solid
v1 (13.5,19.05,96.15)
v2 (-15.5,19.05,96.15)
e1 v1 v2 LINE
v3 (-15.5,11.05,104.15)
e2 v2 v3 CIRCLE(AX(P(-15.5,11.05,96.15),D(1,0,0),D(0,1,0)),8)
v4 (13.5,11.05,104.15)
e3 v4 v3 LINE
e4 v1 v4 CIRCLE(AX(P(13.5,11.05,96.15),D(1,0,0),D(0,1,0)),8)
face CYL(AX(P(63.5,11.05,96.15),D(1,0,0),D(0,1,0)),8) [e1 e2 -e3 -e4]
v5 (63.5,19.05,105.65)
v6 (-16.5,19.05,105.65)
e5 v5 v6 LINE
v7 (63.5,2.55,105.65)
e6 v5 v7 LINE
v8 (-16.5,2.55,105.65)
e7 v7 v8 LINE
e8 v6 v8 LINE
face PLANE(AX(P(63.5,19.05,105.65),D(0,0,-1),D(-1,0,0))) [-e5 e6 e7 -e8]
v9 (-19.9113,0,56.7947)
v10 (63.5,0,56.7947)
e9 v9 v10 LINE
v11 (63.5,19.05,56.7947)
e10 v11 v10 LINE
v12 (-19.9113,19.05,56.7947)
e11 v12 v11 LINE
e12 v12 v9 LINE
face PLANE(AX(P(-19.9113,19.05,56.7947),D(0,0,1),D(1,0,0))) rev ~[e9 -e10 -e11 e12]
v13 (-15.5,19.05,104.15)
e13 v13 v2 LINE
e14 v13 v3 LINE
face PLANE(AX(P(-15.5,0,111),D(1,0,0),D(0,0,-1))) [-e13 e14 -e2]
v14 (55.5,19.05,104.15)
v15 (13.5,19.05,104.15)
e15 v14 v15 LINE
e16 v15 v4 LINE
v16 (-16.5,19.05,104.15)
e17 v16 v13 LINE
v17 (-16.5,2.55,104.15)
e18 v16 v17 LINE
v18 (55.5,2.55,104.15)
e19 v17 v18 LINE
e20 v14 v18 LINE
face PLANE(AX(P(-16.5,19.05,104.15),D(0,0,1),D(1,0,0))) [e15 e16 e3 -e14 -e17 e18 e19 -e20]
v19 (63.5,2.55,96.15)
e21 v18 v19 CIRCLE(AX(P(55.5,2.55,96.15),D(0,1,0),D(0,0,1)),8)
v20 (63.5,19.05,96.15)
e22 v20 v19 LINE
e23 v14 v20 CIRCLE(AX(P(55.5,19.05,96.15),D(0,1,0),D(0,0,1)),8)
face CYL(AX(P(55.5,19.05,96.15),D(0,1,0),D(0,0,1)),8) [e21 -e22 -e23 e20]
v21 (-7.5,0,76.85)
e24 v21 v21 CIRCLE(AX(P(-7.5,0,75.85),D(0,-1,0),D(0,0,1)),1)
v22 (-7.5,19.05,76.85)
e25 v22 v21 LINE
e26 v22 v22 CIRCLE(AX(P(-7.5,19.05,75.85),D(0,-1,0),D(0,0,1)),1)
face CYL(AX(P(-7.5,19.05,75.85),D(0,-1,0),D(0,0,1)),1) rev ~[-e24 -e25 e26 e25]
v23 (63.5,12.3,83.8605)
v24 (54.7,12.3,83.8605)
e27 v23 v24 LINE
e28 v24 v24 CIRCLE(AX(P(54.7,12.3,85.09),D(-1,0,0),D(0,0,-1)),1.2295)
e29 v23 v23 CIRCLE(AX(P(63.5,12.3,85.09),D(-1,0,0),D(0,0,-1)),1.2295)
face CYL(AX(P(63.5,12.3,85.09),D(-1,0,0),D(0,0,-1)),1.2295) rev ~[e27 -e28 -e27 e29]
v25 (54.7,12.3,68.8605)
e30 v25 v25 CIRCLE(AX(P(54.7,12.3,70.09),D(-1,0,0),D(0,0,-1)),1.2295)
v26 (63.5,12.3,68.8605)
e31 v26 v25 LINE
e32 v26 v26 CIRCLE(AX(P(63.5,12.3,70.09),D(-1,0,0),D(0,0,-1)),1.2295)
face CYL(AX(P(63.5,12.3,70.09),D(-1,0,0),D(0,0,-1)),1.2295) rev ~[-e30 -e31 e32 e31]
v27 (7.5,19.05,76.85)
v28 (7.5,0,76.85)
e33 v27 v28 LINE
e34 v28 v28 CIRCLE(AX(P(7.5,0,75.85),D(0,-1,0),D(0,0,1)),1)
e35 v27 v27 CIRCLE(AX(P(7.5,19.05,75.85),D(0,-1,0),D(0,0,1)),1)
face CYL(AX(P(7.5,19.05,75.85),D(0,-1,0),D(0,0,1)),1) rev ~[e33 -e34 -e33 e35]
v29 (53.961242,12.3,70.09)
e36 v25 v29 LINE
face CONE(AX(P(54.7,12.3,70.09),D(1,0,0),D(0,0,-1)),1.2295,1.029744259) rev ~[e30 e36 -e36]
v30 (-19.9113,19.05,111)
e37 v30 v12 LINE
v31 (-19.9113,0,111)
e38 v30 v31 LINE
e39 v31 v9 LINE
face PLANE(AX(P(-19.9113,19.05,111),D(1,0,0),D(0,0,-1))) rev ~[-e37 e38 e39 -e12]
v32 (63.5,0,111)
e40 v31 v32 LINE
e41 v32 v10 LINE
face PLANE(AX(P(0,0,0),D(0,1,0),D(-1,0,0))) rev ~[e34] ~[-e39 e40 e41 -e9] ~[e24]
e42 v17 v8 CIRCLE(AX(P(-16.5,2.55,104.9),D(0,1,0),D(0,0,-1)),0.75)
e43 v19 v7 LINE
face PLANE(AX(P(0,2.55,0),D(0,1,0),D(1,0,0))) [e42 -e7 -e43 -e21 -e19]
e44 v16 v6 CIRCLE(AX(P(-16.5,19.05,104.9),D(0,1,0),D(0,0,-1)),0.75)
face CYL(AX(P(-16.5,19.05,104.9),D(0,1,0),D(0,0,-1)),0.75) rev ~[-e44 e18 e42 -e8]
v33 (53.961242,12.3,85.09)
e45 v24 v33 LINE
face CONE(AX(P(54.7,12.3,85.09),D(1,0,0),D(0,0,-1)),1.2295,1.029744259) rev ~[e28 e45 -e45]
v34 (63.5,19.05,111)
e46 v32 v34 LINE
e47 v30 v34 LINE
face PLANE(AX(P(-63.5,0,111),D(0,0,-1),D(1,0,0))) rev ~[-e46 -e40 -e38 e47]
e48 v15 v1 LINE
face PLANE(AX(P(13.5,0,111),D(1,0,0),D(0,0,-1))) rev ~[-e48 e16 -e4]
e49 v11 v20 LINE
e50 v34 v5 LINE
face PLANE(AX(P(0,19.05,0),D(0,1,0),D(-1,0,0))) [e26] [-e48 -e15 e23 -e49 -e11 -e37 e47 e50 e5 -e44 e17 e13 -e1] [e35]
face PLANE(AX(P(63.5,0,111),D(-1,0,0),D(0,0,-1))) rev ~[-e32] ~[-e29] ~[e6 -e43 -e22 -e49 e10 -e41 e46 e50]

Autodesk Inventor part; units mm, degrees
ref_plane "YZ Plane" through (0, 0, 0) normal (1, 0, 0) x (0, 1, 0)
ref_plane "XZ Plane" through (0, 0, 0) normal (0, 1, 0) x (-1, 0, 0)
ref_plane "XY Plane" through (0, 0, 0) normal (0, 0, 1) x (1, 0, 0)
sketch "Sketch1" plane through (0, 0, 0) normal (0, 1, 0) x (-1, 0, 0)
  line L0 (-63.5, -111) -> (63.5, -111)
  line L1 (63.5, -111) -> (63.5, 111)
  line L2 (63.5, 111) -> (-63.5, 111)
  line L3 (-63.5, 111) -> (-63.5, -111)
  line L4 (-63.5, -111) -> (63.5, 111) construction
  line L5 (63.5, -111) -> (-63.5, 111) construction
  point P0 (0, 0)
  dimension "d0" = 127
  dimension "d1" = 222
extrude "Extrusion1" add sketch "Sketch1" along normal blind 19.05
sketch "Sketch12" plane through (0, 19.05, 0) normal (0, 1, 0) x (1, 0, 0)
  line L0 (63.5, -111) -> (63.5, 111) projected
  line L1 (-16.5, -104.15) -> (63.5, -104.15)
  line L2 (63.5, -104.15) -> (63.5, -105.65)
  line L3 (63.5, -105.65) -> (-16.5, -105.65)
  circle A0 centre (33, -60.25) radius 1.2295 projected
  circle A1 centre (33, -47.45) radius 1.2295 projected
  arc A2 (-16.5, -104.15) -> (-16.5, -105.65) centre (-16.5, -104.9) ccw
  circle A3 centre (-33, -9.45) radius 1.2295 projected
  circle A4 centre (-33, -60.25) radius 1.2295 projected
  circle A5 centre (33, -98.25) radius 1.2295 projected
  line L4 (-16.5, -53.35) -> (63.5, -53.35)
  line L5 (63.5, -53.35) -> (63.5, -54.85)
  line L6 (63.5, -54.85) -> (-16.5, -54.85)
  arc A6 (-16.5, -53.35) -> (-16.5, -54.85) centre (-16.5, -54.1) ccw
  line L7 (-16.5, -2.55) -> (63.5, -2.55)
  line L8 (63.5, -2.55) -> (63.5, -4.05)
  line L9 (63.5, -4.05) -> (-16.5, -4.05)
  arc A7 (-16.5, -2.55) -> (-16.5, -4.05) centre (-16.5, -3.3) ccw
  line L10 (-16.5, 48.25) -> (63.5, 48.25)
  line L11 (63.5, 48.25) -> (63.5, 46.75)
  line L12 (63.5, 46.75) -> (-16.5, 46.75)
  arc A8 (-16.5, 48.25) -> (-16.5, 46.75) centre (-16.5, 47.5) ccw
  point P0 (0, 0)
  point P1 (63.5, -60.2)
  point P2 (63.5, -9.4)
  point P3 (63.5, 41.4)
  dimension "d156" = 1.5
  dimension "d157" = 12.8
  dimension "d159" = 0.75
  dimension "d160" = 80
  dimension "d161" = 50.8
  dimension "d162" = 5.9
  dimension "d165" = 50.8
extrude "Extrusion7" cut sketch "Sketch12" against normal blind 16.5 contours L3 A2 L1 L0 | L6 A6 L4 L0 | L9 A7 L7 L0 | L12 A8 L10 L0
sketch "Sketch13" plane through (63.5, 0, 111) normal (1, 0, 0) x (0, 0, -1)
  line L0 (0, 0) -> (222, 0) projected
  line L1 (0, 0) -> (0, 19.05) projected
  line L2 (56.15, 2.55) -> (56.15, 19.05) projected
  line L3 (5.35, 2.55) -> (5.35, 19.05) projected
  point P0 (111, 0)
  point P1 (25.91, 12.3)
  point P2 (40.91, 12.3)
  point P3 (0, 17.05)
  point P4 (56.65, 17.05)
  point P5 (5.85, 17.05)
  point P6 (76.71, 12.3)
  point P7 (91.71, 12.3)
  point P8 (127.51, 12.3)
  point P9 (142.51, 12.3)
  point P10 (178.31, 12.3)
  point P11 (193.31, 12.3)
  point P12 (56.15, 19.05)
  point P13 (5.35, 19.05)
  dimension "d176" = 50.8
  dimension "d173" = 12.3
  dimension "d174" = 15
  dimension "d175" = 25.91
  dimension "d179" = 50.8
hole "Hole7" at (63.5, 12.3, 85.09) at (63.5, 12.3, 70.09) at (63.5, 12.3, 34.29) at (63.5, 12.3, 19.29) at (63.5, 12.3, -16.51) at (63.5, 12.3, -31.51) at (63.5, 12.3, -67.31) at (63.5, 12.3, -82.31) direction (-1, 0, 0) diameter 2.459 depth 8.8 tip angle 118 thread size "M3x0.5" class "6H" standard "ANSI Metric M Profile"
sketch "Sketch14" plane through (63.5, 0, 111) normal (1, 0, 0) x (0, 0, -1)
  line L0 (6.85, 19.05) -> (6.85, 2.55) projected
  arc A0 (14.85, 19.05) -> (6.85, 11.05) centre (14.85, 11.05) ccw
  line L1 (14.85, 11.05) -> (14.85, 19.05) construction
  line L2 (14.85, 11.05) -> (6.85, 11.05) construction
  line L3 (6.85, 19.05) -> (56.15, 19.05) projected
  line L4 (14.85, 19.05) -> (6.85, 19.05)
  line L5 (6.85, 19.05) -> (6.85, 11.05)
  arc A1 (65.65, 19.05) -> (57.65, 11.05) centre (65.65, 11.05) ccw
  line L6 (65.65, 19.05) -> (57.65, 19.05)
  line L7 (57.65, 19.05) -> (57.65, 11.05)
  arc A2 (116.45, 19.05) -> (108.45, 11.05) centre (116.45, 11.05) ccw
  line L8 (116.45, 19.05) -> (108.45, 19.05)
  line L9 (108.45, 19.05) -> (108.45, 11.05)
  arc A3 (167.25, 19.05) -> (159.25, 11.05) centre (167.25, 11.05) ccw
  line L10 (167.25, 19.05) -> (159.25, 19.05)
  line L11 (159.25, 19.05) -> (159.25, 11.05)
  point P0 (111, 0)
  dimension "d191" = 90
  dimension "d192" = 8
  dimension "d193" = 8
  dimension "d198" = 50.8
extrude "Extrusion8" cut sketch "Sketch14" against normal blind 79
extrude "Extrusion10" add sketch "Sketch14" against normal blind 50
sketch "Sketch15" plane through (0, 19.05, 0) normal (0, 1, 0) x (1, 0, 0)
  arc A0 (55.5, -104.15) -> (63.5, -96.15) centre (55.5, -96.15) ccw
  line L0 (55.5, -96.15) -> (55.5, -104.15) construction
  line L1 (55.5, -96.15) -> (63.5, -96.15) construction
  line L2 (-15.5, -104.15) -> (63.5, -104.15) projected
  line L3 (63.5, -96.15) -> (63.5, -54.85) projected
  line L4 (-16.5, -104.15) -> (63.5, -104.15) projected
  line L5 (55.5, -104.15) -> (63.5, -104.15)
  line L6 (63.5, -104.15) -> (63.5, -96.15)
  arc A1 (55.5, -53.35) -> (63.5, -45.35) centre (55.5, -45.35) ccw
  line L7 (63.5, -53.35) -> (63.5, -45.35)
  line L8 (55.5, -53.35) -> (63.5, -53.35)
  arc A2 (55.5, -2.55) -> (63.5, 5.45) centre (55.5, 5.45) ccw
  line L9 (63.5, -2.55) -> (63.5, 5.45)
  line L10 (55.5, -2.55) -> (63.5, -2.55)
  arc A3 (55.5, 48.25) -> (63.5, 56.25) centre (55.5, 56.25) ccw
  line L11 (63.5, 48.25) -> (63.5, 56.25)
  line L12 (55.5, 48.25) -> (63.5, 48.25)
  point P0 (0, 0)
  point P1 (63.5, 56.25)
  point P2 (63.5, 5.45)
  dimension "d203" = 90
  dimension "d204" = 8
  dimension "d207" = 50.8
extrude "Extrusion9" cut sketch "Sketch15" against normal up to surface (16.5 mm away)
sketch "Sketch16" plane through (0, 19.05, 0) normal (0, 1, 0) x (1, 0, 0)
  line L0 (-15.5, -96.15) -> (13.5, -96.15) projected
  line L1 (13.5, -104.15) -> (13.5, -96.15) projected
  point P0 (0, 0)
  point P1 (7.5, -75.85)
  point P2 (-7.5, -75.85)
  point P3 (-16.5, -96.15)
  point P4 (-7.5, -25.05)
  point P5 (7.5, -25.05)
  point P6 (-7.5, 25.75)
  point P7 (7.5, 25.75)
  point P8 (-7.5, 76.55)
  point P9 (7.5, 76.55)
  dimension "d216" = 20.3
  dimension "d217" = 15
  dimension "d218" = 6
  dimension "d221" = 50.8
hole "Hole8" at (-7.5, 19.05, 25.05) at (-7.5, 19.05, -25.75) at (7.5, 19.05, -25.75) at (-7.5, 19.05, -76.55) at (7.5, 19.05, -76.55) at (7.5, 19.05, 75.85) at (-7.5, 19.05, 75.85) at (7.5, 19.05, 25.05) direction (0, -1, 0) diameter 2 end through all
sketch "Sketch17" plane through (0, 19.05, 0) normal (0, 1, 0) x (1, 0, 0)
  line L0 (63.5, -111) -> (63.5, 111) projected
  line L1 (63.5, -111) -> (-19.9113, -111)
  line L2 (-19.9113, -111) -> (-19.9113, -56.7947)
  line L3 (-19.9113, -56.7947) -> (63.5, -56.7947)
  line L4 (63.5, -56.7947) -> (63.5, -111)
  line L5 (-63.5, 111) -> (-63.5, -111) projected
  line L6 (-19.9113, -111) -> (-63.5, -111)
  line L7 (-63.5, -111) -> (-63.5, 111)
  line L8 (-63.5, 111) -> (63.5, 111)
  point P0 (0, 0)
extrude "Extrusion11" cut sketch "Sketch17" against normal through all contours L3 L2 L6 L5 L8 L0
properties part number "Tamale Assembly Plate FLEX V1 Print Section"
